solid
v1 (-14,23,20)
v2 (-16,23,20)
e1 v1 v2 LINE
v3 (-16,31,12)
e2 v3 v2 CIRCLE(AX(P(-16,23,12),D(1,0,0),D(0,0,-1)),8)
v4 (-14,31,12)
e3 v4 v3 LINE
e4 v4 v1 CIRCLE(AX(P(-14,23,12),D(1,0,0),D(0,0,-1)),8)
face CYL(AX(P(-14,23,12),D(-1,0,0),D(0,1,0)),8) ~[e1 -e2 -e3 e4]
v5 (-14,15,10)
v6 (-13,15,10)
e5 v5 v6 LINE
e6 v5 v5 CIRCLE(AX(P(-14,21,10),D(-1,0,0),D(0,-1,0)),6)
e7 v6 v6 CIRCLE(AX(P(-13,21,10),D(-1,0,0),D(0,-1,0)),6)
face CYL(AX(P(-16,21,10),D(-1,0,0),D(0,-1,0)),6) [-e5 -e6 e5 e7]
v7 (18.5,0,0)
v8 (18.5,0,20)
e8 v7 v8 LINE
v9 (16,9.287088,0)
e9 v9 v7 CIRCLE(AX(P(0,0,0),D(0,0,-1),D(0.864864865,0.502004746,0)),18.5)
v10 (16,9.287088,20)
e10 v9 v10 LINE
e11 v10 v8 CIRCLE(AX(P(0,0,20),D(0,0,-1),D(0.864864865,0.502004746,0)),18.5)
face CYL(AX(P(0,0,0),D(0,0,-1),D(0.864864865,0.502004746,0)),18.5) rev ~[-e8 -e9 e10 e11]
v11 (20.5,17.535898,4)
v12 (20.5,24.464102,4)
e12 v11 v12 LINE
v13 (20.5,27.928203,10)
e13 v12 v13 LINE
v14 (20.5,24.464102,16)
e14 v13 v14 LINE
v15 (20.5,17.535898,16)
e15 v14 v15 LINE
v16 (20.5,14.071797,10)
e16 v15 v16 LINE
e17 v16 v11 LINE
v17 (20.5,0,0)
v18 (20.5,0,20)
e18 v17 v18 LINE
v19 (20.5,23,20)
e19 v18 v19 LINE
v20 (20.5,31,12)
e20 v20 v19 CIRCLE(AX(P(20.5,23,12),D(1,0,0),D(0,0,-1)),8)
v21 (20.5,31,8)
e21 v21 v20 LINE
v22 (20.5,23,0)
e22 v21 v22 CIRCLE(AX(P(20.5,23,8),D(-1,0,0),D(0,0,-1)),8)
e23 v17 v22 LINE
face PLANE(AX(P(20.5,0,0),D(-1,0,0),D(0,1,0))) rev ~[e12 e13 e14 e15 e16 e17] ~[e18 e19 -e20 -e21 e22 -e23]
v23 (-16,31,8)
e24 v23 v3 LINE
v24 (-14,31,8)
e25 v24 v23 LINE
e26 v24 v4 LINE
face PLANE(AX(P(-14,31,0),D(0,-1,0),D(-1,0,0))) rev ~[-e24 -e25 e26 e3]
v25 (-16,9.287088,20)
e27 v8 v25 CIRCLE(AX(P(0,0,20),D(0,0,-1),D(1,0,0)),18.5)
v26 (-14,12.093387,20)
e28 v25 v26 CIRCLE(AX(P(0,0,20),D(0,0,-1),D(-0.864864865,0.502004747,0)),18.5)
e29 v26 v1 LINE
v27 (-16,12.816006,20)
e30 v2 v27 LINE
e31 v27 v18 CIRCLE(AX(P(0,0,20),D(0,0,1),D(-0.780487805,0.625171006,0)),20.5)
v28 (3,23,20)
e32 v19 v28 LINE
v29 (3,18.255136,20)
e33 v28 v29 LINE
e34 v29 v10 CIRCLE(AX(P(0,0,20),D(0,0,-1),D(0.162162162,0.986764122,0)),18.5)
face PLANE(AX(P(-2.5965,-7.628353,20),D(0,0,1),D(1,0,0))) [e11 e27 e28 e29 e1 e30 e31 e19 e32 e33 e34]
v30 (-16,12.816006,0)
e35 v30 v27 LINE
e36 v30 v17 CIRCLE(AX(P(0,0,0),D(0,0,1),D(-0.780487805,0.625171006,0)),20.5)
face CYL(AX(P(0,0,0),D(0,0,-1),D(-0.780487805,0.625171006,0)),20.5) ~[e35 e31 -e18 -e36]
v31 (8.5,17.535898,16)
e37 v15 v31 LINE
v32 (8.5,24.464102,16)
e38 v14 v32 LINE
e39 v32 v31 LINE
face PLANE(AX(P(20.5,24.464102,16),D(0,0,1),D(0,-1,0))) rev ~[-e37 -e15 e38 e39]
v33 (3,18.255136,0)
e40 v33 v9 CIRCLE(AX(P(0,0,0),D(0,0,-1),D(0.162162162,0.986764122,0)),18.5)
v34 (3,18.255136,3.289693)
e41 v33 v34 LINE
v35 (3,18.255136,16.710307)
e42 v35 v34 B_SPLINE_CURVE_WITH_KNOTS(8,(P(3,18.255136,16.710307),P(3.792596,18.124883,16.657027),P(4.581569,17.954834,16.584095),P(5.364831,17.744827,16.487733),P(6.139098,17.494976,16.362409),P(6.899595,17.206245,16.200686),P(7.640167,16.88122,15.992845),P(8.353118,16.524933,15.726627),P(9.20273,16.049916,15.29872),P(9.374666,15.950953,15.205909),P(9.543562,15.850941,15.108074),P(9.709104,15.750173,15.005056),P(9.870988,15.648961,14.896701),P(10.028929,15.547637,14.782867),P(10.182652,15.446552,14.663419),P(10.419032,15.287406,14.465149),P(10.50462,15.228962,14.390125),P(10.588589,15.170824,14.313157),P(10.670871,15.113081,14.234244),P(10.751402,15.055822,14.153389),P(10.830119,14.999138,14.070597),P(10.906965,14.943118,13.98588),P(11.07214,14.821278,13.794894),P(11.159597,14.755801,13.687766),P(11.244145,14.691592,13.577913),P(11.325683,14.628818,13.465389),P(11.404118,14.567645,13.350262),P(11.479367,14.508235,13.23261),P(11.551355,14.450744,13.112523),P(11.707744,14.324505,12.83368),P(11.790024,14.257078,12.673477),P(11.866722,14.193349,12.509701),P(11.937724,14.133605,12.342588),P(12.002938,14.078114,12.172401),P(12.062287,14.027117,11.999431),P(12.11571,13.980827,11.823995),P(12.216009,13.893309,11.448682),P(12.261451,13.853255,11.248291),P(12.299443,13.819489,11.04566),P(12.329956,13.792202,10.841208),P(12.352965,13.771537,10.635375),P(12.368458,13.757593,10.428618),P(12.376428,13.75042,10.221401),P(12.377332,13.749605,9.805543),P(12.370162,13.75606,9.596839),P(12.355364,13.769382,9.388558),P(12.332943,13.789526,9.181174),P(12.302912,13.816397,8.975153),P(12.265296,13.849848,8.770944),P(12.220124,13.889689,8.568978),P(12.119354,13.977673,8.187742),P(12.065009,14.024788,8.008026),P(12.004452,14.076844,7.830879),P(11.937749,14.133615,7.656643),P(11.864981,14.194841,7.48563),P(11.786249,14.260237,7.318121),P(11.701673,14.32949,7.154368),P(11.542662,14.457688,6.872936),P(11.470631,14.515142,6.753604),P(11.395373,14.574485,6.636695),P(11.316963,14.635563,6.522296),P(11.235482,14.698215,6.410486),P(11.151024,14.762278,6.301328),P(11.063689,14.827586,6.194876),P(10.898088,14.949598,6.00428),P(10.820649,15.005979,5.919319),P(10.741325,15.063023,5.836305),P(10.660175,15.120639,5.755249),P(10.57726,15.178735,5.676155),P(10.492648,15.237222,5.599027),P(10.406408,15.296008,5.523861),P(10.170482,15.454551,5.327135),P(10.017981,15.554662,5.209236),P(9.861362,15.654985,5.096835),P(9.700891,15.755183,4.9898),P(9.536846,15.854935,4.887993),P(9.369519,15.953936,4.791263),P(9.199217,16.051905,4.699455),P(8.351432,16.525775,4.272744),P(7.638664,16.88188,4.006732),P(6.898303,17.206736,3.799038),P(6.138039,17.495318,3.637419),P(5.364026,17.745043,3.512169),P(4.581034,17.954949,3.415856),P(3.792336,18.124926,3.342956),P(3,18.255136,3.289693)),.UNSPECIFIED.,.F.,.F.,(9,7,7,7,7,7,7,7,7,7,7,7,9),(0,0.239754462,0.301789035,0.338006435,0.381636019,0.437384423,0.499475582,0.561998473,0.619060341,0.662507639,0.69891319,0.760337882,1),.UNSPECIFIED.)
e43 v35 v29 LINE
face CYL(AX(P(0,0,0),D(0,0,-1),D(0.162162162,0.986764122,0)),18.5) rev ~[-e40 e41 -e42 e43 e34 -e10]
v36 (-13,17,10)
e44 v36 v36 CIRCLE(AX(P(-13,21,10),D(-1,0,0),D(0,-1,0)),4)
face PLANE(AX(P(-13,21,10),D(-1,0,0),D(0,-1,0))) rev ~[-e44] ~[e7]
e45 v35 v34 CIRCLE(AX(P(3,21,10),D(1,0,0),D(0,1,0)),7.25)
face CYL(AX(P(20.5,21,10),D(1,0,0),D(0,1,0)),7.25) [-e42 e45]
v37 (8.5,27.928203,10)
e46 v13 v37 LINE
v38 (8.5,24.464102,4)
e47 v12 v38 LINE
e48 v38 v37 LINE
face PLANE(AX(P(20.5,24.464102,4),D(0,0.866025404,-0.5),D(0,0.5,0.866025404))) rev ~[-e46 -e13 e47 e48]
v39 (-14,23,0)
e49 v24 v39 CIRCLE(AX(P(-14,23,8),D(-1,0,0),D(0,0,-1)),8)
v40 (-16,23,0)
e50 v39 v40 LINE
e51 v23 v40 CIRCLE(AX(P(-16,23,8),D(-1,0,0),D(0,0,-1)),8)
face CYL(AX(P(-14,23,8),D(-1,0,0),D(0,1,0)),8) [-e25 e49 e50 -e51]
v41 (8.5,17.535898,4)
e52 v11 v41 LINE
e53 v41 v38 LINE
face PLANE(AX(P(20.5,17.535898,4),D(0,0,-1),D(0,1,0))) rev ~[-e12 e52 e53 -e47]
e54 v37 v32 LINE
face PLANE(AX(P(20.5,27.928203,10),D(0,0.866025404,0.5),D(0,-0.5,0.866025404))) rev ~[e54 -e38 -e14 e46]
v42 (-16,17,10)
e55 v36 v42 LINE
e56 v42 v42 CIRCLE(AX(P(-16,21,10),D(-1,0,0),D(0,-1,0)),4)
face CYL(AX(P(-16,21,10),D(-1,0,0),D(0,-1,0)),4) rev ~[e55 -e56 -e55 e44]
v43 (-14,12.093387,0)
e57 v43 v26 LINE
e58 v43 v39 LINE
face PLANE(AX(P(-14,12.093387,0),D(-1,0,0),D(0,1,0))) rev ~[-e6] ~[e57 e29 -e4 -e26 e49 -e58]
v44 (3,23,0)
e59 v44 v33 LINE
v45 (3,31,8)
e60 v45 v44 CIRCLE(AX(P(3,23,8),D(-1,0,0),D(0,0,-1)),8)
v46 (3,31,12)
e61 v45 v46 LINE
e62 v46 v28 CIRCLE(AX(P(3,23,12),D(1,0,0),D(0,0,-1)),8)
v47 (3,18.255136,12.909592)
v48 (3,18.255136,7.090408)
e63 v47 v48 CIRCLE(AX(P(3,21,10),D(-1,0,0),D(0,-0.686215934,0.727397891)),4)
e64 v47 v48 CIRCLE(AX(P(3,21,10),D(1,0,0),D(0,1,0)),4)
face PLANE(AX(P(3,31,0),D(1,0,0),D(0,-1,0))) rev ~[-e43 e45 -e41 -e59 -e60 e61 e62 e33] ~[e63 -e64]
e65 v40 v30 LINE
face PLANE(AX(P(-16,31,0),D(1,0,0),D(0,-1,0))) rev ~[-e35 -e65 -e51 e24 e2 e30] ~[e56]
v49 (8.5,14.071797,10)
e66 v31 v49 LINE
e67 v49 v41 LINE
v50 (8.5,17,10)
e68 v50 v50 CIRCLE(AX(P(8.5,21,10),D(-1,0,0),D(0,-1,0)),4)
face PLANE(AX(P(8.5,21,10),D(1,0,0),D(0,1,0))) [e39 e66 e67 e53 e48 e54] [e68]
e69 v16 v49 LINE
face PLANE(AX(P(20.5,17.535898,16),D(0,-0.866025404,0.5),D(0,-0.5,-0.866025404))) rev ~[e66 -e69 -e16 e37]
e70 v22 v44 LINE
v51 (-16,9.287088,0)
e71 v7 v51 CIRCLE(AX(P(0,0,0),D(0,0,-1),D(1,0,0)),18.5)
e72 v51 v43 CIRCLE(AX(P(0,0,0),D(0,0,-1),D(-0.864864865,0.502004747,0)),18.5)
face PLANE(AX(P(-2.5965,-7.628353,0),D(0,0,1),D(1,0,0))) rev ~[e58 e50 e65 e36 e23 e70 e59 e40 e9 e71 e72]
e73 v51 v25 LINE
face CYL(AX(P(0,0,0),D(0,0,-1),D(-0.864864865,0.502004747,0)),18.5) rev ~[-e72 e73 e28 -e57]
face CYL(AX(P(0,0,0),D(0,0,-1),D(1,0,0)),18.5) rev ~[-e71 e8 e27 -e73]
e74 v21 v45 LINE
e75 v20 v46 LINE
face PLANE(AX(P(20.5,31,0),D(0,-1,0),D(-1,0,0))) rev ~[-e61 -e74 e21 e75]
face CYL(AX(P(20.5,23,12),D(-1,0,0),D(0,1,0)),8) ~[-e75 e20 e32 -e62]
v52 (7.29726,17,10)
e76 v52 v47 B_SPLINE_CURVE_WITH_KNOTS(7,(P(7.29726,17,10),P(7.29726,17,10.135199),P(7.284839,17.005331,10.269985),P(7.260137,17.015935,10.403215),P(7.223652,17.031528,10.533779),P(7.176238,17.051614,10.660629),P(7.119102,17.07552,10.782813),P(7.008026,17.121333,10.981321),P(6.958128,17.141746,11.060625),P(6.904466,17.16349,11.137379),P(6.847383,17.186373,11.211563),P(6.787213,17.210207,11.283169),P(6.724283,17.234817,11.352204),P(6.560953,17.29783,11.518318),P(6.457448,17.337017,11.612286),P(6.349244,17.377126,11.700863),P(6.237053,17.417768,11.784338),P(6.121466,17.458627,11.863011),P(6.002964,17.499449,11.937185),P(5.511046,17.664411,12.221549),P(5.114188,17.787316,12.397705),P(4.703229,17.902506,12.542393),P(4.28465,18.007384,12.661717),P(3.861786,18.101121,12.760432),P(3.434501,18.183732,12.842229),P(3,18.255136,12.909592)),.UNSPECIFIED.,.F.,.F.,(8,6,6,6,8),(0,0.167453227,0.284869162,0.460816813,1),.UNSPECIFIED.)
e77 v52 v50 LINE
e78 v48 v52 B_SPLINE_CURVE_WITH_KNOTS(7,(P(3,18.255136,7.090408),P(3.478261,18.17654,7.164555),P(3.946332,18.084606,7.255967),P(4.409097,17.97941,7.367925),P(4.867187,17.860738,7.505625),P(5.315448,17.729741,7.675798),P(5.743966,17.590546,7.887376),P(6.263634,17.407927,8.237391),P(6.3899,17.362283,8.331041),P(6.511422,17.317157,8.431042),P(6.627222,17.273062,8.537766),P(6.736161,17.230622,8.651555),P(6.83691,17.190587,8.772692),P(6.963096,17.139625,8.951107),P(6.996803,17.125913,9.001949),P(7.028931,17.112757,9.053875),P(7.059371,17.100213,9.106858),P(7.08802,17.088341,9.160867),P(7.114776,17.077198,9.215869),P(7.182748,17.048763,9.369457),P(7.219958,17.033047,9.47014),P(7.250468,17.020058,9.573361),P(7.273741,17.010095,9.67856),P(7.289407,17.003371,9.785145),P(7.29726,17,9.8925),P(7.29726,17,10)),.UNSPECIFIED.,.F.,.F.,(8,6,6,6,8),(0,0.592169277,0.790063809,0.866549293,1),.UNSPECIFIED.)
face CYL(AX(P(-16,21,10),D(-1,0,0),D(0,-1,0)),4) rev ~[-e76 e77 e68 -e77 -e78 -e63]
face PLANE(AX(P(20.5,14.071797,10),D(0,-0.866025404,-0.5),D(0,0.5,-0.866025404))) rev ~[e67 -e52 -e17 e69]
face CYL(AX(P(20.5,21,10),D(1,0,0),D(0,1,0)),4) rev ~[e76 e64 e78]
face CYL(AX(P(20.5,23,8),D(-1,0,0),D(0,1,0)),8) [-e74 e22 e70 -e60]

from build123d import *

# Parameters (mm, degrees)
F1_DEPTH = 20
F2_R     = 4
F3_DEPTH = 40
F2_R_2   = 6
F4_DEPTH = 3
F5_R     = 7.25
F5_R_2   = 4
F6_DEPTH = 17.5
F7_DEPTH = 12
F8_R     = 8


# Not quite as in the source:
# - a feature names something its author has since deleted; it is built from what else it names


with BuildPart() as f1:
    # F0 (on Top) → F1 (new body)
    with BuildSketch(Plane.XY):
        with BuildLine():
            Line((20.5, 0), (18.5, 0))
            ThreePointArc((18.5, 0), (-4.8088460154, -17.8640700849), (-16, 9.2870878105))
            Line((-16, 9.2870878105), (-16, 12.816005618))
            ThreePointArc((-16, 12.816005618), (-6.7915388536, -19.3423111339), (20.5, 0))
        make_face()
        with BuildLine():
            Line((-16, 31), (-16, 12.816005618))
            ThreePointArc((-16, 12.816005618), (-15.0387928923, 13.9314287976), (-14, 14.9749791319))
            Line((-14, 14.9749791319), (-14, 31))
            Line((-14, 31), (-16, 31))
        make_face()
        with BuildLine():
            Line((-16, 12.816005618), (-16, 9.2870878105))
            ThreePointArc((-16, 9.2870878105), (-15.0654846671, 10.7369069915), (-14, 12.0933866224))
            Line((-14, 12.0933866224), (-14, 14.9749791319))
            ThreePointArc((-14, 14.9749791319), (-15.0387928923, 13.9314287976), (-16, 12.816005618))
        make_face()
        with BuildLine():
            ThreePointArc((16, 12.816005618), (19.3423111339, 6.7915388536), (20.5, 0))
            Line((20.5, 0), (20.5, 31))
            Line((20.5, 31), (16, 31))
            Line((16, 31), (16, 12.816005618))
        make_face()
        with BuildLine():
            ThreePointArc((16, 9.2870878105), (17.8640700849, 4.8088460154), (18.5, 0))
            Line((18.5, 0), (20.5, 0))
            ThreePointArc((20.5, 0), (19.3423111339, 6.7915388536), (16, 12.816005618))
            Line((16, 12.816005618), (16, 9.2870878105))
        make_face()
        with BuildLine():
            ThreePointArc((3, 20.2792997907), (10.2066248083, 17.7784929064), (16, 12.816005618))
            Line((16, 12.816005618), (16, 31))
            Line((16, 31), (3, 31))
            Line((3, 31), (3, 20.2792997907))
        make_face()
        with BuildLine():
            ThreePointArc((3, 18.2551362635), (10.5050689319, 15.2280506545), (16, 9.2870878105))
            Line((16, 9.2870878105), (16, 12.816005618))
            ThreePointArc((16, 12.816005618), (10.2066248083, 17.7784929064), (3, 20.2792997907))
            Line((3, 20.2792997907), (3, 18.2551362635))
        make_face()
    extrude(amount=F1_DEPTH)

    # F2 (on face) → F3 (cut)
    with BuildSketch(Plane(origin=(-16, 0, 0), x_dir=(0, -1, 0), z_dir=(-1, 0, 0))):
        with Locations((-21, 10)):
            Circle(F2_R)
    extrude(amount=-F3_DEPTH, mode=Mode.SUBTRACT)

    # F2 (on face) → F4 (join)
    with BuildSketch(Plane(origin=(-16, 0, 0), x_dir=(0, -1, 0), z_dir=(-1, 0, 0))):
        with Locations((-21, 10)):
            Circle(F2_R_2)
        with Locations((-21, 10)):
            Circle(F2_R, mode=Mode.SUBTRACT)
    extrude(amount=-F4_DEPTH)

    # F5 (on face) → F6 (join)
    with BuildSketch(Plane.YZ.offset(20.5)):
        with Locations((21, 10)):
            Circle(F5_R)
        Polygon((14.0717967697, 10), (17.5358983849, 16), (24.4641016151, 16), (27.9282032303, 10), (24.4641016151, 4), (17.5358983849, 4), align=None, mode=Mode.SUBTRACT)
        Polygon((24.4641016151, 16), (17.5358983849, 16), (14.0717967697, 10), (17.5358983849, 4), (24.4641016151, 4), (27.9282032303, 10), align=None)
        with Locations((21, 10)):
            Circle(F5_R_2, mode=Mode.SUBTRACT)
    extrude(amount=-F6_DEPTH)

    # F5 (on face) → F7 (cut)
    with BuildSketch(Plane.YZ.offset(20.5)):
        Polygon((24.4641016151, 16), (17.5358983849, 16), (14.0717967697, 10), (17.5358983849, 4), (24.4641016151, 4), (27.9282032303, 10), align=None)
        with Locations((21, 10)):
            Circle(F5_R_2, mode=Mode.SUBTRACT)
    extrude(amount=-F7_DEPTH, mode=Mode.SUBTRACT)

    # F8
    f8_edges = [f1.edges().sort_by_distance(p)[0] for p in [
        (11.75, 31, 20),
        (-15, 31, 20),
        (11.75, 31, 0),
        (-15, 31, 0),
    ]]
    fillet(f8_edges, radius=F8_R)


solid = f1.part
